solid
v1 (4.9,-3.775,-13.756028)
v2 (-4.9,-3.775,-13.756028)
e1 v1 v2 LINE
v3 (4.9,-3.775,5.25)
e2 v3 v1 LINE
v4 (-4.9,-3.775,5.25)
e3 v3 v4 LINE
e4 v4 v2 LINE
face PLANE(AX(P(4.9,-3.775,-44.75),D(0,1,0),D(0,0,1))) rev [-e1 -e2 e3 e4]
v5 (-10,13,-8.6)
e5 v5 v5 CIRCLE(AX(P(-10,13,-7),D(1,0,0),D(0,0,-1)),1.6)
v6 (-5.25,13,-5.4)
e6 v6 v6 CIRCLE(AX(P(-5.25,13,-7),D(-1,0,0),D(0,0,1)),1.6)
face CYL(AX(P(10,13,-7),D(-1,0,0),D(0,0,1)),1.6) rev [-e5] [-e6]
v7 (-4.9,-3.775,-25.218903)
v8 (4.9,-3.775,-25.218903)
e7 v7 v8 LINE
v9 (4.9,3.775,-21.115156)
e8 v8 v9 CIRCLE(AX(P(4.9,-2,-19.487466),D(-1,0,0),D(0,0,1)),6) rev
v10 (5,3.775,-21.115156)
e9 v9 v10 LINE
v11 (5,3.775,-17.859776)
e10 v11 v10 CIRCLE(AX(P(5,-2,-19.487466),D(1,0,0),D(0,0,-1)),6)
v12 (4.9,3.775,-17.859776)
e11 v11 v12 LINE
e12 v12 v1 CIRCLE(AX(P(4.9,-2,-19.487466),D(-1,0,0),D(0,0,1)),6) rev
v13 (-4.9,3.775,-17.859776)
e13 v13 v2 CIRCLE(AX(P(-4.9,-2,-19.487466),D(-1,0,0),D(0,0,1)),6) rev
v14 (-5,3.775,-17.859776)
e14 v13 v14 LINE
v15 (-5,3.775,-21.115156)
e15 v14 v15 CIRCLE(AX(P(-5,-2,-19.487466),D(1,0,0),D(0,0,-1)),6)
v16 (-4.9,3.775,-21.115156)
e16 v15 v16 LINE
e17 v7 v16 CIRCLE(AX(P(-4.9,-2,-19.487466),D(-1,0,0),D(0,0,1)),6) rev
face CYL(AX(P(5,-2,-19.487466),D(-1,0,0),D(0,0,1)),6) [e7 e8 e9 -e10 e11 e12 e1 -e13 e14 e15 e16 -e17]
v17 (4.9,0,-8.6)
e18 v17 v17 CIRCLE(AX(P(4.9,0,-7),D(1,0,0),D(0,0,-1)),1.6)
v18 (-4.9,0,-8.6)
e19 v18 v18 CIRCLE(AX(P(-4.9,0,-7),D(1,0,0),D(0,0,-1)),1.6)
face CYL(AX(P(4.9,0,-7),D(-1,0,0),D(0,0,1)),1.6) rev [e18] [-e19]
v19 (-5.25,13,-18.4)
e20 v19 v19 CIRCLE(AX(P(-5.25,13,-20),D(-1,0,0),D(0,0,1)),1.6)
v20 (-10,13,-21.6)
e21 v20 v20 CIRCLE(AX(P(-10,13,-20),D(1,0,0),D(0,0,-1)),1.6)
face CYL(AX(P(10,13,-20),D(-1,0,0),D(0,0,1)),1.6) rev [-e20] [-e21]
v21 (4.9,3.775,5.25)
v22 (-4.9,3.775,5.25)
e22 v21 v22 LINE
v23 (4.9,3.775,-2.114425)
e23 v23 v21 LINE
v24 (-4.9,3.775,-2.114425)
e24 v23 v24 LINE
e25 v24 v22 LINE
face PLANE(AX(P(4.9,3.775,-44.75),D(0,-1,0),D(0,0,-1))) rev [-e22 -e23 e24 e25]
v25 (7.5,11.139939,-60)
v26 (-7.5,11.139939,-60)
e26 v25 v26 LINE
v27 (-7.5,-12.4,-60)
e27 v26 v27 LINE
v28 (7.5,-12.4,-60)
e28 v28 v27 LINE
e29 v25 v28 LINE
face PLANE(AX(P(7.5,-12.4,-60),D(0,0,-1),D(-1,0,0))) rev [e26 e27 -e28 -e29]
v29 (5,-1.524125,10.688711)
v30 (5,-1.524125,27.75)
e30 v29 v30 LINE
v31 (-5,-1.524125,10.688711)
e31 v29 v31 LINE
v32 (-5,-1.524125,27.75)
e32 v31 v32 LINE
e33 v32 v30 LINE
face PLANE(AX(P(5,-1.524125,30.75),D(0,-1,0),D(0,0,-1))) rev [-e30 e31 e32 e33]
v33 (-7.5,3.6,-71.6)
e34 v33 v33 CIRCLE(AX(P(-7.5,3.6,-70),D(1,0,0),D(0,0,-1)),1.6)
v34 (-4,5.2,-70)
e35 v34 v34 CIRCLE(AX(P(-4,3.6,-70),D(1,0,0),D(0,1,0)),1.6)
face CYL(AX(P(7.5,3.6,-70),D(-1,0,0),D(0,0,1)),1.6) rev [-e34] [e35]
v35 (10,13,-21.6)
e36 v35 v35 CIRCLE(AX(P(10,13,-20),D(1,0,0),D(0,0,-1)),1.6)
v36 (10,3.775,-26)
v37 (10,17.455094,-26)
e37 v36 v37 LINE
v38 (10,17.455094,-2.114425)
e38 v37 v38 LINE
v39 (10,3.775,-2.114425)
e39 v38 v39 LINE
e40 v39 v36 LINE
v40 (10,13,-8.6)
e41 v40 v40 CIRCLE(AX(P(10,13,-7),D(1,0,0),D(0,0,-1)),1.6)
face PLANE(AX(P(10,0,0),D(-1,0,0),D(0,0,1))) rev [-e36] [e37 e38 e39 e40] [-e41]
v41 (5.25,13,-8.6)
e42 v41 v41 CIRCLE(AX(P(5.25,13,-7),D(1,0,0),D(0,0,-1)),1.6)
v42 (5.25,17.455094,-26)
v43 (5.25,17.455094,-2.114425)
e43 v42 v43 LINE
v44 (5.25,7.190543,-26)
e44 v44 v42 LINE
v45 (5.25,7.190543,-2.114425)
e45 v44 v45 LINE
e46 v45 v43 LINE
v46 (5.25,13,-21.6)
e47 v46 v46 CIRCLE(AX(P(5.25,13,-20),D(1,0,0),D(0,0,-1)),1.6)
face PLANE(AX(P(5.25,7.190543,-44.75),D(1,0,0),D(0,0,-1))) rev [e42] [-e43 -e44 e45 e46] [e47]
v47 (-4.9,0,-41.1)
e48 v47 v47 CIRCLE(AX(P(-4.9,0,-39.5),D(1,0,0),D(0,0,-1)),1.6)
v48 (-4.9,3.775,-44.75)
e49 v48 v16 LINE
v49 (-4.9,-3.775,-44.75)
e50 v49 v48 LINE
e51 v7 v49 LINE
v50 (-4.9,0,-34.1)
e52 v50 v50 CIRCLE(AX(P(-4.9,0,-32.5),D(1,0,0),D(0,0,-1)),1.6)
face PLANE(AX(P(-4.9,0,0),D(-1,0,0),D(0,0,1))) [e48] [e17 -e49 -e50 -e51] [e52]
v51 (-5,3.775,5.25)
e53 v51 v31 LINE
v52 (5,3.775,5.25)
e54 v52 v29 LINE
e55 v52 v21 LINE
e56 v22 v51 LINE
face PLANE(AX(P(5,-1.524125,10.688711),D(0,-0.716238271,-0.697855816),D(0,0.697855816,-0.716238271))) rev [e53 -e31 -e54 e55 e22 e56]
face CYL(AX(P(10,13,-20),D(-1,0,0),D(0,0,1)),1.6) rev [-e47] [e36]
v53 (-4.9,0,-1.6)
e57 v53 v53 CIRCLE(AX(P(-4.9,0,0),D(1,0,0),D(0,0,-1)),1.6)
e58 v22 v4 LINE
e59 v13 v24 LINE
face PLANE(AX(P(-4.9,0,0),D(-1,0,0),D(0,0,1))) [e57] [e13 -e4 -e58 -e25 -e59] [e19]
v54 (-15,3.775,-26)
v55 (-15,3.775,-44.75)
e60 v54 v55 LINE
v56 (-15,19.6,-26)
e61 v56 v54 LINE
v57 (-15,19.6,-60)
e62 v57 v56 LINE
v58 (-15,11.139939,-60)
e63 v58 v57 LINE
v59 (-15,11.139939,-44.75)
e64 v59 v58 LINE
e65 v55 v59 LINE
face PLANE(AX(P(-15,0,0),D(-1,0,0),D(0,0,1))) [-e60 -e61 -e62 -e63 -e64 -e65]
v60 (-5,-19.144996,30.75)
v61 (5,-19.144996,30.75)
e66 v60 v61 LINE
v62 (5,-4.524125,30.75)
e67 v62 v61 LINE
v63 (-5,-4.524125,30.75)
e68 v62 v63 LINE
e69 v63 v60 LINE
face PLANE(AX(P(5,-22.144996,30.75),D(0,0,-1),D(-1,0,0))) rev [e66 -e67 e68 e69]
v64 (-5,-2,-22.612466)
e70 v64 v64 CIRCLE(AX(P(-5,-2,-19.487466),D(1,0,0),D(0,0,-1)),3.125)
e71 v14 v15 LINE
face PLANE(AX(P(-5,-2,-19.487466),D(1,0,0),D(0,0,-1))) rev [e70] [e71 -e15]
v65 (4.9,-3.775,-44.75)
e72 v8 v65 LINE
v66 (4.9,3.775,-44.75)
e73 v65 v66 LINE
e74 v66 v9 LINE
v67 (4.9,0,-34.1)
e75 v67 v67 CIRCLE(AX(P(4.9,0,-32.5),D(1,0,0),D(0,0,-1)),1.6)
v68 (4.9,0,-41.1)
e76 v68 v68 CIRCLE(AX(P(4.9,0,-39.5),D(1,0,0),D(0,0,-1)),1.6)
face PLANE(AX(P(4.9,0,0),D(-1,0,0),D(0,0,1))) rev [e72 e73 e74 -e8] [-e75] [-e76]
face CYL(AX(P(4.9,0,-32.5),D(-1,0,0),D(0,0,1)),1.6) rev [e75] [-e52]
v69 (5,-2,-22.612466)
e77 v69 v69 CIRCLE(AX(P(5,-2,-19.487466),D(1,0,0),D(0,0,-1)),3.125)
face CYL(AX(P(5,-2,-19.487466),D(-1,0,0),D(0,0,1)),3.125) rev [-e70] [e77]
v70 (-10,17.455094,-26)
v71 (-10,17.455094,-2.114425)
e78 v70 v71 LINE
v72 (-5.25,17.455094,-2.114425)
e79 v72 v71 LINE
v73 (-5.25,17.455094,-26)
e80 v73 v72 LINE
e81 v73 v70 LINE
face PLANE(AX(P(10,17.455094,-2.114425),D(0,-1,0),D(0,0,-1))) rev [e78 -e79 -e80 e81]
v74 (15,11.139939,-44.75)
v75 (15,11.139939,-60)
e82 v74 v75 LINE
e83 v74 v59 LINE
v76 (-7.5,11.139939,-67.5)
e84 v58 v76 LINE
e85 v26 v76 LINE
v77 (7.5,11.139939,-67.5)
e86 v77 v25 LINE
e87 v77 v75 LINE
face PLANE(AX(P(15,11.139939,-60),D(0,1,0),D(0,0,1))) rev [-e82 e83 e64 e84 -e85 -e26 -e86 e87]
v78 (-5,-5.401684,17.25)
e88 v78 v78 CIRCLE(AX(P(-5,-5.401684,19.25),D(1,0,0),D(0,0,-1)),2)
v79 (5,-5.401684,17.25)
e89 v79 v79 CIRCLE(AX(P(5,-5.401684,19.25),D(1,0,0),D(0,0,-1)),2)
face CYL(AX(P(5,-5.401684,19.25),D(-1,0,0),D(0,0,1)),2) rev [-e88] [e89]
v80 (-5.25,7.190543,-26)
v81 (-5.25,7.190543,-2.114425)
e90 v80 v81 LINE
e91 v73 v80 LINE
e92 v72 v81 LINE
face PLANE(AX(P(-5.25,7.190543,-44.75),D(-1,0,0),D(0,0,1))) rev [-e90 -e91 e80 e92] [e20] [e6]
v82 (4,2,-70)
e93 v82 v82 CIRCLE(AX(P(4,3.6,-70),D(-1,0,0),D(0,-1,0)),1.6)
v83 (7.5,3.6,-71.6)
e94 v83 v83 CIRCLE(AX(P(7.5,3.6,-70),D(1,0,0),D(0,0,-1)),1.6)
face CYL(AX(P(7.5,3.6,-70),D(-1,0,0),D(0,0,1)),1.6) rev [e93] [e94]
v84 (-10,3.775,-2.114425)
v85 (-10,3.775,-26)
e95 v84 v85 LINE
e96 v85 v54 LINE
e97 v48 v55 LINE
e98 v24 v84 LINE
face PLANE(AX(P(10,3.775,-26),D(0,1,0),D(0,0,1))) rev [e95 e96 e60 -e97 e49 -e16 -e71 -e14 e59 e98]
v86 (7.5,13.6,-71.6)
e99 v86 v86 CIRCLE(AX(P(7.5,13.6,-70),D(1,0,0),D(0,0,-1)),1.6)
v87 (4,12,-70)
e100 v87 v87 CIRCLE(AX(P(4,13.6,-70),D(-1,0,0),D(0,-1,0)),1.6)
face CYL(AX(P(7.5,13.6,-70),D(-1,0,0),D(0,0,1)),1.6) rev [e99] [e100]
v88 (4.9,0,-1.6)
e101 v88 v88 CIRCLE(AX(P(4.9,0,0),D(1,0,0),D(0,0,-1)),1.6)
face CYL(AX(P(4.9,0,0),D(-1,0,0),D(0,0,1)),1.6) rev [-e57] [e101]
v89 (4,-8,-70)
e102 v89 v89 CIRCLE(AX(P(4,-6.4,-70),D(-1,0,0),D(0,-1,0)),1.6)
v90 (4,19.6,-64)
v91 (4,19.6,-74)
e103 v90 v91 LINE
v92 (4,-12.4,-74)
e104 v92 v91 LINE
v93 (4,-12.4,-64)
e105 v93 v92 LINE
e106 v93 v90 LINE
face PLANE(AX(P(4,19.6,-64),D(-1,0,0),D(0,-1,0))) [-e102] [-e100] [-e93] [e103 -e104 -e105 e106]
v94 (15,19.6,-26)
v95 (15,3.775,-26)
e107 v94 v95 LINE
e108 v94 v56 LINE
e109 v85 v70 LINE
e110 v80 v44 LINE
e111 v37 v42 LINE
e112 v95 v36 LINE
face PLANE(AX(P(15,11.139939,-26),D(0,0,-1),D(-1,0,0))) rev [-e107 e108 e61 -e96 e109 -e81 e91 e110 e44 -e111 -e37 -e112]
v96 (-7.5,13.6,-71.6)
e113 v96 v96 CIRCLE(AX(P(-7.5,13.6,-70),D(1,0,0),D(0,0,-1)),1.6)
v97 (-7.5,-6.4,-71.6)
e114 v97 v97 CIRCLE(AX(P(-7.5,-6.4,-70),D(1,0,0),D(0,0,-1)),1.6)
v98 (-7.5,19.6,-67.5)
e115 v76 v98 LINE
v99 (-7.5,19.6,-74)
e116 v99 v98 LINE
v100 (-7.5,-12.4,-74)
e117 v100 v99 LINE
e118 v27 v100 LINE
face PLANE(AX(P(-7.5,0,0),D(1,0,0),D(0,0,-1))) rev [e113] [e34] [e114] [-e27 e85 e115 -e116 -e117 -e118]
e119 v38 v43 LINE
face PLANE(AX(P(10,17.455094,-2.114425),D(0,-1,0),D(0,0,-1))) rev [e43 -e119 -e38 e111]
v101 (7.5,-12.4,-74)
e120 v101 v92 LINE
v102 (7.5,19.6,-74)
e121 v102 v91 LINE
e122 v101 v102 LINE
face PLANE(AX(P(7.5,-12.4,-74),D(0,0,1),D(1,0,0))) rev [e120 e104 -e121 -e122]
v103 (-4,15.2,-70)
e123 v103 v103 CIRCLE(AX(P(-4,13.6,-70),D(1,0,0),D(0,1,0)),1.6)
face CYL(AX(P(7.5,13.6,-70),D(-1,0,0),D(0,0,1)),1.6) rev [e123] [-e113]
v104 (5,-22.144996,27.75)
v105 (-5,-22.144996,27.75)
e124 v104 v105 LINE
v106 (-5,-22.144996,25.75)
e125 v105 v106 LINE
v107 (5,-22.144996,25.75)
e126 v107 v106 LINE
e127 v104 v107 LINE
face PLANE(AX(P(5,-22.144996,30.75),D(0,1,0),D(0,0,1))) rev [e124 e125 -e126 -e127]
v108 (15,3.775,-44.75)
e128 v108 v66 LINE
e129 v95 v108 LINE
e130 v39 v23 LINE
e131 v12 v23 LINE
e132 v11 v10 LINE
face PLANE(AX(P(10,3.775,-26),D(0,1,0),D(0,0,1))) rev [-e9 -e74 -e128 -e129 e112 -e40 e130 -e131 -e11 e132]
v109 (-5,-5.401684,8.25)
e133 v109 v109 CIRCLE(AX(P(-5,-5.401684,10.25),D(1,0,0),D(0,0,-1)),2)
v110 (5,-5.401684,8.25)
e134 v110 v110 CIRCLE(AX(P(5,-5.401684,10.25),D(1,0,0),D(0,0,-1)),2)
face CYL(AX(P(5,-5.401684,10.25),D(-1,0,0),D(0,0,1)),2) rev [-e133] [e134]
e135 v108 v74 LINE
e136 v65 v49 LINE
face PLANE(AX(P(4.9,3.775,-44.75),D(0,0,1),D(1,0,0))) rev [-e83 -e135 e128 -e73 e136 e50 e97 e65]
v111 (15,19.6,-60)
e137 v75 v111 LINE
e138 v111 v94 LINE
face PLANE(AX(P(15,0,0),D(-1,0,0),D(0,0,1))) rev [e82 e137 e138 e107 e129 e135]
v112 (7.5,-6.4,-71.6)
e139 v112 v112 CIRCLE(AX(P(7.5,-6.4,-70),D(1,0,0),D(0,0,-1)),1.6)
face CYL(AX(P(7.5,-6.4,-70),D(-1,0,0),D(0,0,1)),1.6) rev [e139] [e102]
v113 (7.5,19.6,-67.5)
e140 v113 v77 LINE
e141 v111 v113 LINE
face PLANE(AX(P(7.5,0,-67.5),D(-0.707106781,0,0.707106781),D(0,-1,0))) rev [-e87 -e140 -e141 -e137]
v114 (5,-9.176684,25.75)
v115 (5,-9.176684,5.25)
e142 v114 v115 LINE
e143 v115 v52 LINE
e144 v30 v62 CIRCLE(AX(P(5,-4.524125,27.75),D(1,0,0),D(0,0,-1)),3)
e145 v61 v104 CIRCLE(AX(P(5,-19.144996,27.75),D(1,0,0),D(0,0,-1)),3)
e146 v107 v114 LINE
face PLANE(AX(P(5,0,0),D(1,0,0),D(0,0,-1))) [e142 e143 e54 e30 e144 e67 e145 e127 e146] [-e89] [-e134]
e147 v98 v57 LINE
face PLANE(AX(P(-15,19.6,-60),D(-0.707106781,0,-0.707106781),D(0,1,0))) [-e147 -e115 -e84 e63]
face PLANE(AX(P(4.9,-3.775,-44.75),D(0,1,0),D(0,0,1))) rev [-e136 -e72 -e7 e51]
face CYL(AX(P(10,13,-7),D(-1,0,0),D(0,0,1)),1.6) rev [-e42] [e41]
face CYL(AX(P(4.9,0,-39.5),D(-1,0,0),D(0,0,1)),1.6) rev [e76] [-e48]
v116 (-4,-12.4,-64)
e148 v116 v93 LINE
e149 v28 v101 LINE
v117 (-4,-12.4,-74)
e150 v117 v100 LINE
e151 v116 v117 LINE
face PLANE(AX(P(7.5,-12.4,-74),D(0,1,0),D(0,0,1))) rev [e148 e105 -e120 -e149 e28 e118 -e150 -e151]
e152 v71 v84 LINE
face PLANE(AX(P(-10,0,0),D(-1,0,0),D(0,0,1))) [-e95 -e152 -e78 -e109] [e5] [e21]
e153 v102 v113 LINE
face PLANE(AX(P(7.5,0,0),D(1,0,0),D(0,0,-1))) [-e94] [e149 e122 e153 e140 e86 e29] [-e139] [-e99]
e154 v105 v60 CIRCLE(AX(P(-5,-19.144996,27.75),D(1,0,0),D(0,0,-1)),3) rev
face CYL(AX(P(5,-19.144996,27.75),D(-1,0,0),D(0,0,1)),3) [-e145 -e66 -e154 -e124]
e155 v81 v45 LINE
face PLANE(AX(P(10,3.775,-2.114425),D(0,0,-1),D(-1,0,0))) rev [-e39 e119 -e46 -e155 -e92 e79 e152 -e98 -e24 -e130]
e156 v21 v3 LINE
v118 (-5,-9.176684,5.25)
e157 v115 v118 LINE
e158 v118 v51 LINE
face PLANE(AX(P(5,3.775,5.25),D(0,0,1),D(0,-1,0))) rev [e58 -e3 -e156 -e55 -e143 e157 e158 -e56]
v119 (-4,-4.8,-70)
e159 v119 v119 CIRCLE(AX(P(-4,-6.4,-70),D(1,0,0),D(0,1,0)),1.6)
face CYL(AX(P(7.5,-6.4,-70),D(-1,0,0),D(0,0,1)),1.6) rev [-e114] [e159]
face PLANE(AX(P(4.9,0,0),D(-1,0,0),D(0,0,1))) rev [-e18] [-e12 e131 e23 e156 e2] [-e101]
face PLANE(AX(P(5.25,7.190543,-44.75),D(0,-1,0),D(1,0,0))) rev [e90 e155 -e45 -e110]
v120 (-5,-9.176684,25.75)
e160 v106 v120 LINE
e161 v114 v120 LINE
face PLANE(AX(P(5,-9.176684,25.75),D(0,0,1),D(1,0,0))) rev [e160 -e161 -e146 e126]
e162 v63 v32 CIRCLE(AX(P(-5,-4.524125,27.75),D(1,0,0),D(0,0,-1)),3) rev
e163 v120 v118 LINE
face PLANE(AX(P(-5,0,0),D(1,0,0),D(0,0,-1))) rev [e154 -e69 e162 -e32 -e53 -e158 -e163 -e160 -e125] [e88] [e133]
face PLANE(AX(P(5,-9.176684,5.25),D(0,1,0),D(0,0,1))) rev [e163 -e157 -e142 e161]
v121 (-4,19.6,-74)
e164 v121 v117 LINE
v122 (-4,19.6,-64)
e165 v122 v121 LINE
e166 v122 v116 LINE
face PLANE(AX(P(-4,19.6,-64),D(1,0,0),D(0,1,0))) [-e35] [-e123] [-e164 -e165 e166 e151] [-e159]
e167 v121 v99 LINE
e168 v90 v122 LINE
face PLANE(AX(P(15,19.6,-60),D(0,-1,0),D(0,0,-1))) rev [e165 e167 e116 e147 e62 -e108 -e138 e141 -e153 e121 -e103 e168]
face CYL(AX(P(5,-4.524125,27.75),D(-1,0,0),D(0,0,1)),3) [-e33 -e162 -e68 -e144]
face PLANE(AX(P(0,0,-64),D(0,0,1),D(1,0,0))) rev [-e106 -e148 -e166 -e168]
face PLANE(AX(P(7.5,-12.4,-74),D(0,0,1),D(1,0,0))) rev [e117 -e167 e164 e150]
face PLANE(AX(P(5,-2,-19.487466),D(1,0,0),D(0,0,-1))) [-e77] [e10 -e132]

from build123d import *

# Parameters (mm, degrees)
SKETCH_2_W               = 50
SKETCH_2_H               = 7.55
SKETCH_2_R               = 1.6
EXTRUDE_1_DEPTH          = 4.9
SKETCH_3_W               = 23.885574904
SKETCH_3_H               = 13.680093874
SKETCH_3_R               = 1.6
EXTRUDE_2_DEPTH          = 10
SKETCH_4_W               = 10.5
SKETCH_4_H               = 10.264550668
CUT_EXTRUDE_1_DEPTH      = 48.143107127
SKETCH_6_W               = 14
SKETCH_6_H               = 32
SKETCH_6_R               = 1.6
EXTRUDE_4_DEPTH          = 7.5
SKETCH_7_W               = 8
SKETCH_7_H               = 32
CUT_EXTRUDE_2_DEPTH      = 10
EXTRUDE_5_DEPTH          = 15
CHAMFER_1_SIZE           = 7.5
SKETCH_10_R              = 2
EXTRUDE_6_DEPTH          = 5
FILLET_1_R               = 3
SKETCH_11_R              = 6
SKETCH_11_R_2            = 3.125
EXTRUDE_7_DEPTH          = 5
CUT_EXTRUDE_3_DEPTH      = 79.685454984
CUT_EXTRUDE_3_DEPTH_BACK = 79.685454984
SKETCH_12_R              = 3.125


with BuildPart() as part:
    # 草图2 → 凸台-拉伸1 (new, symmetric)
    with BuildSketch(Plane(origin=(0, 0, 0), x_dir=(0, 0, -1), z_dir=(1, 0, 0))):
        with Locations((19.75, 0)):
            Rectangle(SKETCH_2_W, SKETCH_2_H)
        Circle(SKETCH_2_R, mode=Mode.SUBTRACT)
        with Locations((7, 0)):
            Circle(SKETCH_2_R, mode=Mode.SUBTRACT)
        with Locations((32.5, 0)):
            Circle(SKETCH_2_R, mode=Mode.SUBTRACT)
        with Locations((39.5, 0)):
            Circle(SKETCH_2_R, mode=Mode.SUBTRACT)
    extrude(amount=EXTRUDE_1_DEPTH, both=True)

    # 草图3 → 凸台-拉伸2 (add, symmetric)
    with BuildSketch(Plane(origin=(0, 0, 0), x_dir=(0, 0, -1), z_dir=(1, 0, 0))):
        with Locations((14.057212548, 10.615046937)):
            Rectangle(SKETCH_3_W, SKETCH_3_H)
        with Locations((7, 13)):
            Circle(SKETCH_3_R, mode=Mode.SUBTRACT)
        with Locations((20, 13)):
            Circle(SKETCH_3_R, mode=Mode.SUBTRACT)
    extrude(amount=EXTRUDE_2_DEPTH, both=True)

    # 草图4 → 切除-拉伸1 (cut, through all)
    with BuildSketch(Plane.XY.offset(-2.114425096)):
        with Locations((0, 12.32281854)):
            Rectangle(SKETCH_4_W, SKETCH_4_H)
    extrude(amount=-CUT_EXTRUDE_1_DEPTH, mode=Mode.SUBTRACT)



with BuildPart() as body_2:
    # 草图6 → 凸台-拉伸4 (new, symmetric)
    with BuildSketch(Plane(origin=(0, 0, 0), x_dir=(0, 0, -1), z_dir=(1, 0, 0))):
        with Locations((67, 3.6)):
            Rectangle(SKETCH_6_W, SKETCH_6_H)
        with Locations((70, 3.6)):
            Circle(SKETCH_6_R, mode=Mode.SUBTRACT)
        with Locations((70, 13.6)):
            Circle(SKETCH_6_R, mode=Mode.SUBTRACT)
        with Locations((70, -6.4)):
            Circle(SKETCH_6_R, mode=Mode.SUBTRACT)
    extrude(amount=EXTRUDE_4_DEPTH, both=True)

    # 草图7 → 切除-拉伸2 (cut)
    with BuildSketch(Plane.XY.offset(-74)):
        with Locations((0, 3.6)):
            Rectangle(SKETCH_7_W, SKETCH_7_H)
    extrude(amount=CUT_EXTRUDE_2_DEPTH, mode=Mode.SUBTRACT)


with BuildPart() as part_1:
    add(part.part)

    add(body_2.part)  # 凸台-拉伸5 merges body 2
    # 草图8 → 凸台-拉伸5 (add, symmetric)
    with BuildSketch(Plane(origin=(0, 0, 0), x_dir=(0, 0, -1), z_dir=(1, 0, 0))):
        Polygon((60, 19.6), (26, 19.6), (26, 11.139938787), (26, 3.775), (44.75, 3.775), (44.75, 11.139938787), (60, 11.139938787), align=None)
    extrude(amount=EXTRUDE_5_DEPTH, both=True)

    # 倒角1
    chamfer_1_edges = [part_1.edges().sort_by_distance(p)[0] for p in [
        (-7.5, 15.369969393, -60),
        (7.5, 15.369969393, -60),
    ]]
    chamfer(chamfer_1_edges, length=CHAMFER_1_SIZE - 0.0001)  # a hair under: the kernel refuses the full size

    # 草图10 → 凸台-拉伸6 (add, symmetric)
    with BuildSketch(Plane(origin=(0, 0, 0), x_dir=(0, 0, -1), z_dir=(1, 0, 0))):
        Polygon((-5.25, 3.775), (-5.25, -9.176683543), (-25.75, -9.176683543), (-25.75, -22.144995508), (-30.75, -22.144995508), (-30.75, -1.524124881), (-10.688710914, -1.524124881), align=None)
        with Locations((-10.25, -5.401683543)):
            Circle(SKETCH_10_R, mode=Mode.SUBTRACT)
        with Locations((-19.25, -5.401683543)):
            Circle(SKETCH_10_R, mode=Mode.SUBTRACT)
    extrude(amount=EXTRUDE_6_DEPTH, both=True)

    # 圆角1
    fillet_1_edges = [part_1.edges().sort_by_distance(p)[0] for p in [
        (0, -1.524124881, 30.75),
        (0, -22.144995508, 30.75),
    ]]
    fillet(fillet_1_edges, radius=FILLET_1_R)

    # 草图11 → 凸台-拉伸7 (add, symmetric)
    with BuildSketch(Plane(origin=(0, 0, 0), x_dir=(0, 0, -1), z_dir=(1, 0, 0))):
        with Locations((19.487465682, -2)):
            Circle(SKETCH_11_R)
        with Locations((19.487465682, -2)):
            Circle(SKETCH_11_R_2, mode=Mode.SUBTRACT)
    extrude(amount=EXTRUDE_7_DEPTH, both=True)

    # 草图12 → 切除-拉伸3 (cut, two sides: drawn at the far end of the back side and taken through both)
    with BuildSketch(Plane(origin=(0, 0, 0), x_dir=(0, 0, -1), z_dir=(1, 0, 0)).offset(-CUT_EXTRUDE_3_DEPTH_BACK)):
        with Locations((19.487465682, -2)):
            Circle(SKETCH_12_R)
    extrude(amount=CUT_EXTRUDE_3_DEPTH + CUT_EXTRUDE_3_DEPTH_BACK, mode=Mode.SUBTRACT)


solid = part_1.part
